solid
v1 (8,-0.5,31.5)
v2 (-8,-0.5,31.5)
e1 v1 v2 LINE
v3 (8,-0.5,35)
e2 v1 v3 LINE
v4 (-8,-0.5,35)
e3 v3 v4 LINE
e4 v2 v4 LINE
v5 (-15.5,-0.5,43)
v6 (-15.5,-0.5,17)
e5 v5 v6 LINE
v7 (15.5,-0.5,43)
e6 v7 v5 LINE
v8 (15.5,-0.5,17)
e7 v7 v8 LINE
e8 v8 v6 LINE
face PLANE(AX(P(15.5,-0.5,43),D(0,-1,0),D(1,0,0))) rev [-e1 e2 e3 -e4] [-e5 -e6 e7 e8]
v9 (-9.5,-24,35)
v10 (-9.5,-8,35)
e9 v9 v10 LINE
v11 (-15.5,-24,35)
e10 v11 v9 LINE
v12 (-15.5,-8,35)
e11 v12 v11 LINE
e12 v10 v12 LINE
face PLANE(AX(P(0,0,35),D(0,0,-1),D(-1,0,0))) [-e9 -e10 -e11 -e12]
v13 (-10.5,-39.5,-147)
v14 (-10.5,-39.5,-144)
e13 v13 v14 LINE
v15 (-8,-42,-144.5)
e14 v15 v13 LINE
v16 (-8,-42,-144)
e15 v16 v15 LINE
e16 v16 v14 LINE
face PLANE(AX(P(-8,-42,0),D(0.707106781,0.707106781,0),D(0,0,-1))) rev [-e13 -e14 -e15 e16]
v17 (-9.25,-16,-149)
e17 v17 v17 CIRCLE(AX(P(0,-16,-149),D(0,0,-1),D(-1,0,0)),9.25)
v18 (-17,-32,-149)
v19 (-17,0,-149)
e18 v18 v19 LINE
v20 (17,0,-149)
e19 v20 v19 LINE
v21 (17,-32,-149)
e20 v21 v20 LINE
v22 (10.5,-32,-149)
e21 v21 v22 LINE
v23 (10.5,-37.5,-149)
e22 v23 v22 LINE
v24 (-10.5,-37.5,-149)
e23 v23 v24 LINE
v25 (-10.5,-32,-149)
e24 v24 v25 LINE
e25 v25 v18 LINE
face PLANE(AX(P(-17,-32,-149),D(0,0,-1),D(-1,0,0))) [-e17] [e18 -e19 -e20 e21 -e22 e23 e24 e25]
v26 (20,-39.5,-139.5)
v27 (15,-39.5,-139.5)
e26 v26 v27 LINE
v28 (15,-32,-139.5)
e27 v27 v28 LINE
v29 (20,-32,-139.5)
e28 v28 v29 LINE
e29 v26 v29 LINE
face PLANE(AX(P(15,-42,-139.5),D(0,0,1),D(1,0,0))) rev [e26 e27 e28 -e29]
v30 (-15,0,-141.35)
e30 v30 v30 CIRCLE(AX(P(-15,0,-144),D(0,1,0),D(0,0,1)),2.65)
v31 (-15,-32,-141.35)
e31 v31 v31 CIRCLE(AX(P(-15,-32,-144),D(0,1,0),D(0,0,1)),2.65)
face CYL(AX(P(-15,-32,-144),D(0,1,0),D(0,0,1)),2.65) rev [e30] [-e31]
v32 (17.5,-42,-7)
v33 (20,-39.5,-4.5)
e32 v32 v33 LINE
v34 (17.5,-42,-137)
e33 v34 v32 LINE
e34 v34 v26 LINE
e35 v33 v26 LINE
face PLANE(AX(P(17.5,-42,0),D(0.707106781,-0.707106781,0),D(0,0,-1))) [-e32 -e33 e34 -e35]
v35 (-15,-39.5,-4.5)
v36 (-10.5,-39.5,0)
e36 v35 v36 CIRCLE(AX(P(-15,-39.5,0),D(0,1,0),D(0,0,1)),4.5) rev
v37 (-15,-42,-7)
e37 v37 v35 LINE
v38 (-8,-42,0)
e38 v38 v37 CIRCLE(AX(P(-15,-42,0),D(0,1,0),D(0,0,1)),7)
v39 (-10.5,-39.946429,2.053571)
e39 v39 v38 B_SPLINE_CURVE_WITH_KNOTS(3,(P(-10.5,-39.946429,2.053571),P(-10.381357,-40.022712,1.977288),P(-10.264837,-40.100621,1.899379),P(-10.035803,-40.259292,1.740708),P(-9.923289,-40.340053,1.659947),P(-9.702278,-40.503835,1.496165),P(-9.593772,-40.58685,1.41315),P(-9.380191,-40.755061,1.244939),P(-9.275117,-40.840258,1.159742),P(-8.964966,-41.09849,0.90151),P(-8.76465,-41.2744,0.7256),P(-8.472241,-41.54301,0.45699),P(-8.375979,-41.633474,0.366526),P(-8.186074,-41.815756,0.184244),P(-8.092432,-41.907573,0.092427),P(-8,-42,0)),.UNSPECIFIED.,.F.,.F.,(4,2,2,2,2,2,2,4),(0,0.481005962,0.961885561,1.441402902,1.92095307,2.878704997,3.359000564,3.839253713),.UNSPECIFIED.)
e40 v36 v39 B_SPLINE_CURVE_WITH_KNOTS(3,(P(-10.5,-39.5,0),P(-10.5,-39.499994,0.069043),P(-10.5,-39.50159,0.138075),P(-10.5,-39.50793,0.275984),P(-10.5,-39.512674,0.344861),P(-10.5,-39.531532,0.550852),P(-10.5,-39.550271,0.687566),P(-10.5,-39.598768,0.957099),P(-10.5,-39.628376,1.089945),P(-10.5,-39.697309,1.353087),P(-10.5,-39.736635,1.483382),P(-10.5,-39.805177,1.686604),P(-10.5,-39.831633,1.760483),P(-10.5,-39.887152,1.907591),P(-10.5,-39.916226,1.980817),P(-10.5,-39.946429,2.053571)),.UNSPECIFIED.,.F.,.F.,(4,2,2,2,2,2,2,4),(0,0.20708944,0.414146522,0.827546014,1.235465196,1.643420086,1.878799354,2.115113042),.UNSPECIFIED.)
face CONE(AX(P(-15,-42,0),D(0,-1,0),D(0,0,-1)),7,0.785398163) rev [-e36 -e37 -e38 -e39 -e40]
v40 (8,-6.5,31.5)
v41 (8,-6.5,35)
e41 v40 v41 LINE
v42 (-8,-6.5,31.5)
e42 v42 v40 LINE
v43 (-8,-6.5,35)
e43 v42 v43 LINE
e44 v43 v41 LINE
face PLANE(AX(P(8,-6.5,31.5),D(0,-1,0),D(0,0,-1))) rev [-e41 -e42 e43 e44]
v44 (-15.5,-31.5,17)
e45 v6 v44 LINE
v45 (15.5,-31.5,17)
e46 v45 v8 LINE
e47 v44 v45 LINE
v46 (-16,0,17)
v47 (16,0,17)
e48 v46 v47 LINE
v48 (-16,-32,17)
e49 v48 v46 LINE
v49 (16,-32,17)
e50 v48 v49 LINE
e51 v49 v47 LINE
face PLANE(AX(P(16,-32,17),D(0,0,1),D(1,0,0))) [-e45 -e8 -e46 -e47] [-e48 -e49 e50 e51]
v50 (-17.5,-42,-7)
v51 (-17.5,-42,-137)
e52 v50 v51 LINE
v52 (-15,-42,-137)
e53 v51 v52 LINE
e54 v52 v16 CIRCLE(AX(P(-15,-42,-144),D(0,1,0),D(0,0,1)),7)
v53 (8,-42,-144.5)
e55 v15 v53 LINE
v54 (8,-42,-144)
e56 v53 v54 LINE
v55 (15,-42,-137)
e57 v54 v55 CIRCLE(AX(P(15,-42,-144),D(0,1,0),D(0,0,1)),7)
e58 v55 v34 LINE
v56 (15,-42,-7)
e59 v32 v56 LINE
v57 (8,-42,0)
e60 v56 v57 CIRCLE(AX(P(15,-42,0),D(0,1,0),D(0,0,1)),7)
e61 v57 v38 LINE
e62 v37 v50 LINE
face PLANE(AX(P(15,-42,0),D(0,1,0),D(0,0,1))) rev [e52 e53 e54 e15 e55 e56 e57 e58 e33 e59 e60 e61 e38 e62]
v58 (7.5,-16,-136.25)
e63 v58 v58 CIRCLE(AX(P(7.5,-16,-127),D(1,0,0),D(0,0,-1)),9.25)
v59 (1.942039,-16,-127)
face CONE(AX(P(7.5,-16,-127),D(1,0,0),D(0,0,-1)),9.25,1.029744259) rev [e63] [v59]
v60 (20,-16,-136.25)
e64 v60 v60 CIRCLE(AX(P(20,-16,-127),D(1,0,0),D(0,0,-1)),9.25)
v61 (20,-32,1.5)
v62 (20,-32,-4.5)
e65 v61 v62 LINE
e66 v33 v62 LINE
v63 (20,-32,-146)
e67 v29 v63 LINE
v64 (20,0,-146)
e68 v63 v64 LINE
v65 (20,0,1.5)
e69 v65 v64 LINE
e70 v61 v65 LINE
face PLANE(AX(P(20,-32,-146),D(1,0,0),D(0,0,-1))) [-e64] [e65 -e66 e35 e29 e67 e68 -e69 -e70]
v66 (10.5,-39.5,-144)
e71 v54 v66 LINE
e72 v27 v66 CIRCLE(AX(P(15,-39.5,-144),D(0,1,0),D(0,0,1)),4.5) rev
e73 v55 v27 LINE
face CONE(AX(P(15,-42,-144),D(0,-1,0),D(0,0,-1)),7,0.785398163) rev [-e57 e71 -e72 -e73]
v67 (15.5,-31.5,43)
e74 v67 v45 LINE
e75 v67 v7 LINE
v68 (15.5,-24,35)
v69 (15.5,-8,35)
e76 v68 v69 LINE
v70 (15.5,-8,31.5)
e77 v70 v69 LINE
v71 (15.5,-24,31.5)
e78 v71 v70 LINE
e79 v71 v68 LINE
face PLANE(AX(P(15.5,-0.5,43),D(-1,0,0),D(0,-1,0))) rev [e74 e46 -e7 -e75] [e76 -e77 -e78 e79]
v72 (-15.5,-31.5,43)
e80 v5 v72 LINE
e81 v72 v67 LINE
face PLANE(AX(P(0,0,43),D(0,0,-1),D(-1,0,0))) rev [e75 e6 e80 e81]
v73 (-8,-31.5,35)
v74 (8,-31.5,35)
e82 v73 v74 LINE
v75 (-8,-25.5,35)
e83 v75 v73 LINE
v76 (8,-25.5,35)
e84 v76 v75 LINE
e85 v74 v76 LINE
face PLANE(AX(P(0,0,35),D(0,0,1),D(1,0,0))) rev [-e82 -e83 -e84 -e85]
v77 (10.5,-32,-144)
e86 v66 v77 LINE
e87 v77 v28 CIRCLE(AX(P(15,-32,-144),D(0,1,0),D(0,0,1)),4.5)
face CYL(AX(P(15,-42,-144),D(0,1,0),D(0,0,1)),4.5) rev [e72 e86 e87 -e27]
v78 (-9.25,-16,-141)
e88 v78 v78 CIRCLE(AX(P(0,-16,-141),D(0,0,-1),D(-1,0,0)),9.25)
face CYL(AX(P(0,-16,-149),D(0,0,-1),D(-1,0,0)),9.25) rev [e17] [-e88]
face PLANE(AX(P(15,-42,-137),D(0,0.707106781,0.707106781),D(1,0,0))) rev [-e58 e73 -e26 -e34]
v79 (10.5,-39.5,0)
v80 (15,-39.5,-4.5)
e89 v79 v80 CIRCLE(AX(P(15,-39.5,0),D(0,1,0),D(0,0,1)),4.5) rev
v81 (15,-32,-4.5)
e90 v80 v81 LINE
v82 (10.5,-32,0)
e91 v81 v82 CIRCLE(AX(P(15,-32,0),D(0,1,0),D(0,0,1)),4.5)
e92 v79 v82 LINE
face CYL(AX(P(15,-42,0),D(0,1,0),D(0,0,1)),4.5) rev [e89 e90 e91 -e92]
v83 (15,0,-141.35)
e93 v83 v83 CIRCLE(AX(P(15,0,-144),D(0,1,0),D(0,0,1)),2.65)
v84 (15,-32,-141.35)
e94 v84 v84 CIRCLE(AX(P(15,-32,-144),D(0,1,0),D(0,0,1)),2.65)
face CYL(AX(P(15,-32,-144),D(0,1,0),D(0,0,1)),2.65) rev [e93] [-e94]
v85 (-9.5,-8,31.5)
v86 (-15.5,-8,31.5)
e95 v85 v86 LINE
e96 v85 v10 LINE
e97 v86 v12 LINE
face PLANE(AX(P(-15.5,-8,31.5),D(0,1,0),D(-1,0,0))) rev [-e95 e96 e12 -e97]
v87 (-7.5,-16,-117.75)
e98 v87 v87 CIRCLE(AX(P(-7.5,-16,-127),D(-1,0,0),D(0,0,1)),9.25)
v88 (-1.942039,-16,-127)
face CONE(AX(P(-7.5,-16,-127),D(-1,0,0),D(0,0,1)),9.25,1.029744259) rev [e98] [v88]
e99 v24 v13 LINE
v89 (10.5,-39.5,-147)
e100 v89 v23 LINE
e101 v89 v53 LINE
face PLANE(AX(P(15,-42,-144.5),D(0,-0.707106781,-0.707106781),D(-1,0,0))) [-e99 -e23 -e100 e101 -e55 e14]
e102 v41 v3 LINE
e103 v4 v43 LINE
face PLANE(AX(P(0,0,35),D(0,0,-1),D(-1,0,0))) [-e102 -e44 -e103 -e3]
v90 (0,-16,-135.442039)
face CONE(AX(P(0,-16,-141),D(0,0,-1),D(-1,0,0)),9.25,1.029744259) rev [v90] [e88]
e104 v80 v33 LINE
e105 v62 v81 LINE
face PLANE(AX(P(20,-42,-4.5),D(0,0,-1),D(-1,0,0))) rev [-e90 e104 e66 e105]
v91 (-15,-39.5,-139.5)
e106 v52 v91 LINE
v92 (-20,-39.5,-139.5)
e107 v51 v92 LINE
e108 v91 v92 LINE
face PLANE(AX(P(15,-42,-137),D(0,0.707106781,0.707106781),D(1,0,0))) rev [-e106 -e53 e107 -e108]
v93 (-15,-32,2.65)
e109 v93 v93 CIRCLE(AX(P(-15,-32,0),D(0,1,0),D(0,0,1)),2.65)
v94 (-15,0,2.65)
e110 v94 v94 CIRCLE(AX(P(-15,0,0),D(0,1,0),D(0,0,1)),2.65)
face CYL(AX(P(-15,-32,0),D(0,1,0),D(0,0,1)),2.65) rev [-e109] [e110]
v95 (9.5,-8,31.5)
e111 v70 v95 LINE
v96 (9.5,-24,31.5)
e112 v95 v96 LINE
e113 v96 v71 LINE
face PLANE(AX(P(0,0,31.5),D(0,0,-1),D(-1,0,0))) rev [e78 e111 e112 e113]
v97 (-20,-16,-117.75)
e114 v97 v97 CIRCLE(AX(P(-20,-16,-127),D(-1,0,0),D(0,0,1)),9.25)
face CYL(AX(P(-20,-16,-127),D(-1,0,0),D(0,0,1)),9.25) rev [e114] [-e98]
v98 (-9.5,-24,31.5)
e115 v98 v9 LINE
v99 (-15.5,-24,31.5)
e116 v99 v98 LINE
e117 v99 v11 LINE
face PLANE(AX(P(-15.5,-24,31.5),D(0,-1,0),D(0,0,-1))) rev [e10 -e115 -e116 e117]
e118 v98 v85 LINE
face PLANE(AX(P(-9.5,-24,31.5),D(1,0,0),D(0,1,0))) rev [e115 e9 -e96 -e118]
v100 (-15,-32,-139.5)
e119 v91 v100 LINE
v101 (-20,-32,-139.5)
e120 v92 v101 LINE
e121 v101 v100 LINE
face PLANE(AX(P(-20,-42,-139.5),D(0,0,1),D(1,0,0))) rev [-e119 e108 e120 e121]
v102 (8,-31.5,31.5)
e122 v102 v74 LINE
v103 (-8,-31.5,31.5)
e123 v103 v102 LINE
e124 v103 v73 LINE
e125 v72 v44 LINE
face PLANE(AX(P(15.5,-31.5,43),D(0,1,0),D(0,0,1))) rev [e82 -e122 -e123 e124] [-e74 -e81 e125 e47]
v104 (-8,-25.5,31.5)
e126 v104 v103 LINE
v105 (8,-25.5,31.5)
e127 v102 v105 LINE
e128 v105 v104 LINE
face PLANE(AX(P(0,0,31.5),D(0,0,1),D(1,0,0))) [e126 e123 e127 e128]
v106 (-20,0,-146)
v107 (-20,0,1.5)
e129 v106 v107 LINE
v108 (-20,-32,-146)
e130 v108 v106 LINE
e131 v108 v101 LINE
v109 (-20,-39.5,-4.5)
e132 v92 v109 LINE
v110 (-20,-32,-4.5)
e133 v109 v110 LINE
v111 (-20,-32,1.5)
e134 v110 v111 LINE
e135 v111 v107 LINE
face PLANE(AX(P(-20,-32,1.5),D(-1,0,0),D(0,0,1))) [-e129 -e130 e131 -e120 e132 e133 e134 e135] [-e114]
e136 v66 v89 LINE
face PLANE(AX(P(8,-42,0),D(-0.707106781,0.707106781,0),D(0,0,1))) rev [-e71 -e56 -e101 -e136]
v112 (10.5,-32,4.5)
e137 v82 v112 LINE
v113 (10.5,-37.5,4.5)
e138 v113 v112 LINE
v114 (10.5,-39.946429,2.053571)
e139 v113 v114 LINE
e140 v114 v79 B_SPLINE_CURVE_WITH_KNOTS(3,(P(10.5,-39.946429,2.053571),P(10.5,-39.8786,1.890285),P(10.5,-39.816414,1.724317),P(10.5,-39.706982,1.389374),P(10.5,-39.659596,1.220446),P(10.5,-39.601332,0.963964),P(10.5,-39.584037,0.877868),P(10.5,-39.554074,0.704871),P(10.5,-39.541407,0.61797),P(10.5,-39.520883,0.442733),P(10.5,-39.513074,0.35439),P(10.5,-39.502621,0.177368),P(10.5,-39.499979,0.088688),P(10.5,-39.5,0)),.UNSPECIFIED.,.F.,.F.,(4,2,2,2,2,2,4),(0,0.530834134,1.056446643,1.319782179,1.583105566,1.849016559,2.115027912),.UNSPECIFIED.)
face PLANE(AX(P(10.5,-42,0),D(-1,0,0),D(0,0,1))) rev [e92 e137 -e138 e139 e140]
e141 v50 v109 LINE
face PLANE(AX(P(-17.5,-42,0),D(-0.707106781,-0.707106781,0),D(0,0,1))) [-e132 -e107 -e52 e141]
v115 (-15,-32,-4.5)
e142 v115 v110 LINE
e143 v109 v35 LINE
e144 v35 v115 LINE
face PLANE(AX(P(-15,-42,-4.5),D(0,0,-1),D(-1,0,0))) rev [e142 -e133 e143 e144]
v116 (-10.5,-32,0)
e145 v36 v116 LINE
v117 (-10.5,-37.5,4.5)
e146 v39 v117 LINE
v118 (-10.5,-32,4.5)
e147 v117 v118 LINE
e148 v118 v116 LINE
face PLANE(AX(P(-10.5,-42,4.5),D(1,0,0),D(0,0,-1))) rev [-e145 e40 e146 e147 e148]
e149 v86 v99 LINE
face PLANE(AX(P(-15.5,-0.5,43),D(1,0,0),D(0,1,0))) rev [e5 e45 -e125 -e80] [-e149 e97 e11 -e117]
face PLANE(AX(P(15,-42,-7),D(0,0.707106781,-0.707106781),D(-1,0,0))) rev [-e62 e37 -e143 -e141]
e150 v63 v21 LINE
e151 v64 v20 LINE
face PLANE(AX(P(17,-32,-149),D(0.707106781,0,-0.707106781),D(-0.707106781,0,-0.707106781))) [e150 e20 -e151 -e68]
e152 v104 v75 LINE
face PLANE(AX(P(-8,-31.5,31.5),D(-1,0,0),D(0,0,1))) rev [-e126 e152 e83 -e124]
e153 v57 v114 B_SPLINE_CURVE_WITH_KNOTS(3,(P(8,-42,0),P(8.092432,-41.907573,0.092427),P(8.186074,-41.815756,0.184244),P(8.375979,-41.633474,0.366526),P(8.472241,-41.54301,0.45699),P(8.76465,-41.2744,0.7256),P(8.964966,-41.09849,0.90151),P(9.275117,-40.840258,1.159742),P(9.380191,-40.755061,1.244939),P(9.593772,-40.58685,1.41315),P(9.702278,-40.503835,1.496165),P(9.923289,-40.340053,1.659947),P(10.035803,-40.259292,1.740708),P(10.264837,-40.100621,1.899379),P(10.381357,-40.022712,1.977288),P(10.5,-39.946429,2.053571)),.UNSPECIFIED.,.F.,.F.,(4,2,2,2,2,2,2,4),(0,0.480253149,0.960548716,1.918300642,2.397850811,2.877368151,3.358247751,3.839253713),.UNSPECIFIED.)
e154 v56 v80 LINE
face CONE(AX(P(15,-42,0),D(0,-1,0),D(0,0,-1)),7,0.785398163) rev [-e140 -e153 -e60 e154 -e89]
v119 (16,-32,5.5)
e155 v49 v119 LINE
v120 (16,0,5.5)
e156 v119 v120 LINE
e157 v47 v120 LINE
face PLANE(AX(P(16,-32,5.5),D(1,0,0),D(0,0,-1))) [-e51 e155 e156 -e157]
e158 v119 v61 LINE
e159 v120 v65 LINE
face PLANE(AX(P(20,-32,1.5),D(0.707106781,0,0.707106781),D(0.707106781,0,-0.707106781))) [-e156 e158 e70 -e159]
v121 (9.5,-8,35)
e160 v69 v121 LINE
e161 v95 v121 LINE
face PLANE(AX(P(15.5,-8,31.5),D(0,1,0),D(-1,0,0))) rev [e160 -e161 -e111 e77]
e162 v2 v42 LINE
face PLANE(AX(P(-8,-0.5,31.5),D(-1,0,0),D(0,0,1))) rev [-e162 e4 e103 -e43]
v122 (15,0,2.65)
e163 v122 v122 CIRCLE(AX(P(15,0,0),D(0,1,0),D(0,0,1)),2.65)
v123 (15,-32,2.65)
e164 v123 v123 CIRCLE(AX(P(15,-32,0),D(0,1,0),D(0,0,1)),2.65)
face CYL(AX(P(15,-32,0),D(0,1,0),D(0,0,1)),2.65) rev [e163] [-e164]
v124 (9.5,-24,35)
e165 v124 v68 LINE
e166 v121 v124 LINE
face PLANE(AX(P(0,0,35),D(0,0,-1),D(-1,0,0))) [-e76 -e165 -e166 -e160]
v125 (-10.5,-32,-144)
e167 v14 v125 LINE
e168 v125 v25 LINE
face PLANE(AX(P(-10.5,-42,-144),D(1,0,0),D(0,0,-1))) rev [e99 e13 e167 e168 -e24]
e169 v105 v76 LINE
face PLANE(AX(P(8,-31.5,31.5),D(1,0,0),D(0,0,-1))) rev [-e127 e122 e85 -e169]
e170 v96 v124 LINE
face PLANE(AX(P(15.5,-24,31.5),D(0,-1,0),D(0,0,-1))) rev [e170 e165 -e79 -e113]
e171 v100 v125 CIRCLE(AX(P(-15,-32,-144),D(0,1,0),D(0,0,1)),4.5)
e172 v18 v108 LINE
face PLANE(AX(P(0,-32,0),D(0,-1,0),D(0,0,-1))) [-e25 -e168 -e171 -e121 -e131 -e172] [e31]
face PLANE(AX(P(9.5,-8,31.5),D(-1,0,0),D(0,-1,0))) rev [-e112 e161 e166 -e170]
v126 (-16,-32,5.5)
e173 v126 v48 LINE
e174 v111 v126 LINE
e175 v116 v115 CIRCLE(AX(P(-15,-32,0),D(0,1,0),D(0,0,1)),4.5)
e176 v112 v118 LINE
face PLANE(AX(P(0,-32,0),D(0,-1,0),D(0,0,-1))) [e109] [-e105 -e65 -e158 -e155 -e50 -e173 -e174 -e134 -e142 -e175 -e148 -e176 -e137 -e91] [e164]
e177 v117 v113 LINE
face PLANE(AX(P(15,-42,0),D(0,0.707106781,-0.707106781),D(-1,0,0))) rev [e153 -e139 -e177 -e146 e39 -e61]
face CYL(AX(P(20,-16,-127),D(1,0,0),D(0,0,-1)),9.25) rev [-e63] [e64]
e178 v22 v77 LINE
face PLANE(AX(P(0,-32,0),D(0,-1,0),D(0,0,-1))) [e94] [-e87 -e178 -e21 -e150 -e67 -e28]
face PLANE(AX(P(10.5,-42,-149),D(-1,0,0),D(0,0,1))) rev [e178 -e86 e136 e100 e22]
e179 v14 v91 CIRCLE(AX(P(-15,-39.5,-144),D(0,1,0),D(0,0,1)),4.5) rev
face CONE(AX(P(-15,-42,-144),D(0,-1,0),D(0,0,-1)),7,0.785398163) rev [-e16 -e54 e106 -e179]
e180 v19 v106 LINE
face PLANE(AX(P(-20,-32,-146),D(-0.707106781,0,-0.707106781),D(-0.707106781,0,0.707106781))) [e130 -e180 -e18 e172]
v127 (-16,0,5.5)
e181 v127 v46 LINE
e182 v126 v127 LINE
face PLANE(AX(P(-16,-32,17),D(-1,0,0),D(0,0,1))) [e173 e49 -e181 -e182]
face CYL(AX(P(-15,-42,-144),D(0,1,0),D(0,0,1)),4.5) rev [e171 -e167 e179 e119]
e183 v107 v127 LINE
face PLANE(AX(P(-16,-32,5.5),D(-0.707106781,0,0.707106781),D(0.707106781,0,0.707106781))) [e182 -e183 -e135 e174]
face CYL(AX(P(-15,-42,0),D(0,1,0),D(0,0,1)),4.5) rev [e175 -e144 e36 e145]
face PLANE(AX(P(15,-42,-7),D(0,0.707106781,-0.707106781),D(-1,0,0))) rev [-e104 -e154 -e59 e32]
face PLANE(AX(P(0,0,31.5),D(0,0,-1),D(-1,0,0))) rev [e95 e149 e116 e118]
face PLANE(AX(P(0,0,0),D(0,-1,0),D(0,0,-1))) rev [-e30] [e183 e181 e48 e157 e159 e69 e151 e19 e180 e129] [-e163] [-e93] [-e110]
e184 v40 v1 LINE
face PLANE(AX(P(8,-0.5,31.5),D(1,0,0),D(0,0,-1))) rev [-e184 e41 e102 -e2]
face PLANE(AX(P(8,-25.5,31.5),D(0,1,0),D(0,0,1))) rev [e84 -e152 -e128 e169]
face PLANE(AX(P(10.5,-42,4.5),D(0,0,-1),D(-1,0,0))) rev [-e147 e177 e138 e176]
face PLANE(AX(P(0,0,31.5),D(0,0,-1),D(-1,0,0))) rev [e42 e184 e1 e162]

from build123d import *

# Parameters (mm, degrees)
SKIZZE1_R                       = 2.65
AUFSATZ_LINEAR_AUSTRAGEN1_DEPTH = 32
SKIZZE2_W                       = 31
SKIZZE2_H                       = 31
AUFSATZ_LINEAR_AUSTRAGEN2_DEPTH = 26
AUFSATZ_LINEAR_AUSTRAGEN3_DEPTH = 10
FASE2_SIZE                      = 4.5
FASE1_SIZE                      = 2.5
M20X1_5_GEWINDEBOHRUNG1_D       = 18.5
M20X1_5_GEWINDEBOHRUNG1_DEPTH   = 8
M20X1_5_GEWINDEBOHRUNG1_TIP     = 5.557960726
M20X1_5_GEWINDEBOHRUNG2_D       = 18.5
M20X1_5_GEWINDEBOHRUNG2_DEPTH   = 12.5
M20X1_5_GEWINDEBOHRUNG2_TIP     = 5.557960726
M20X1_5_GEWINDEBOHRUNG3_D       = 18.5
M20X1_5_GEWINDEBOHRUNG3_DEPTH   = 12.5
M20X1_5_GEWINDEBOHRUNG3_TIP     = 5.557960726
SKIZZE10_W                      = 6
SKIZZE10_H                      = 16
SKIZZE10_W_2                    = 16
SKIZZE10_H_2                    = 6
SCHNITT_LINEAR_AUSTRAGEN1_DEPTH = 3.5


with BuildPart() as part:
    # Skizze1 → Aufsatz-Linear austragen1 (new body)
    with BuildSketch(Plane(origin=(0, 0, 0), x_dir=(1, 0, 0), z_dir=(0, 1, 0))):
        Polygon((16, -17), (-16, -17), (-16, -5.5), (-20, -1.5), (-20, 146), (-17, 149), (17, 149), (20, 146), (20, -1.5), (16, -5.5), align=None)
        with Locations(Location((15, 0, 0), (0, 0, 270))):
            Circle(SKIZZE1_R, mode=Mode.SUBTRACT)
        with Locations(Location((-15, 0, 0), (0, 0, 270))):
            Circle(SKIZZE1_R, mode=Mode.SUBTRACT)
        with Locations(Location((-15, 144, 0), (0, 0, 270))):
            Circle(SKIZZE1_R, mode=Mode.SUBTRACT)
        with Locations(Location((15, 144, 0), (0, 0, 270))):
            Circle(SKIZZE1_R, mode=Mode.SUBTRACT)
    extrude(amount=-AUFSATZ_LINEAR_AUSTRAGEN1_DEPTH)

    # Skizze2 → Aufsatz-Linear austragen2 (add)
    with BuildSketch(Plane.XY.offset(17)):
        with Locations((0, -16)):
            Rectangle(SKIZZE2_W, SKIZZE2_H)
    extrude(amount=AUFSATZ_LINEAR_AUSTRAGEN2_DEPTH)

    # Skizze3 → Aufsatz-Linear austragen3 (add)
    with BuildSketch(Plane.XZ.offset(32)):
        with BuildLine():
            Line((20, -4.5), (15, -4.5))
            ThreePointArc((15, -4.5), (11.818019485, -3.181980515), (10.5, 0))
            Line((10.5, 0), (10.5, 4.5))
            Line((10.5, 4.5), (-10.5, 4.5))
            Line((-10.5, 4.5), (-10.5, 0))
            ThreePointArc((-10.5, 0), (-11.818019485, -3.181980515), (-15, -4.5))
            Line((-15, -4.5), (-20, -4.5))
            Line((-20, -4.5), (-20, -139.5))
            Line((-20, -139.5), (-15, -139.5))
            ThreePointArc((-15, -139.5), (-11.818019485, -140.818019485), (-10.5, -144))
            Line((-10.5, -144), (-10.5, -149))
            Line((-10.5, -149), (10.5, -149))
            Line((10.5, -149), (10.5, -144))
            ThreePointArc((10.5, -144), (11.818019485, -140.818019485), (15, -139.5))
            Line((15, -139.5), (20, -139.5))
            Line((20, -139.5), (20, -4.5))
        make_face()
    extrude(amount=AUFSATZ_LINEAR_AUSTRAGEN3_DEPTH)

    # Fase2
    fase2_edges = [part.edges().sort_by_distance(p)[0] for p in [
        (0, -42, 4.5),
        (0, -42, -149),
    ]]
    chamfer(fase2_edges, length=FASE2_SIZE)

    # Fase1
    # the kernel refuses this chamfer: 2.5 mm, written as the material it takes off along each edge
    with BuildSketch(Plane(origin=(10.5, -42, -150.92920747), x_dir=(0.027495876610586282, 0.9996219169112968, 0), z_dir=(0, 0, 1)), Plane(origin=(-10.5, -42, -144), x_dir=(-0.027495876610586282, 0.9996219169112968, 0), z_dir=(0, 0, -1))) as fase1_piece_1:
        Polygon((FASE1_SIZE * 0.999621916911, FASE1_SIZE * 0.0274958766106), (-FASE1_SIZE * 0.0274958766106, FASE1_SIZE * 0.999621916911), (0, 0), align=None)
    extrude(amount=6.92920747, mode=Mode.SUBTRACT)
    with BuildSketch(Plane(origin=(20, -42, -145.92920747), x_dir=(-0.9996219169112968, -0.0274958766105877, 0), z_dir=(0, 0, 1)), Plane(origin=(-20, -42, 1.92920747), x_dir=(0.9996219169112968, -0.0274958766105877, 0), z_dir=(0, 0, -1))) as fase1_piece_2:
        Polygon((FASE1_SIZE * 0.999621916911, -FASE1_SIZE * 0.0274958766106), (-FASE1_SIZE * 0.0274958766106, -FASE1_SIZE * 0.999621916911), (0, 0), align=None)
    extrude(amount=147.85841494, mode=Mode.SUBTRACT)
    with BuildSketch(Plane(origin=(26.42920747, -42, -4.5), x_dir=(0, -0.0274958766105877, -0.9996219169112968), z_dir=(-1, 0, 0)), Plane(origin=(-15, -42, -4.5), x_dir=(0, -0.0274958766105877, -0.9996219169112968), z_dir=(-1, 0, 0)), Plane(origin=(-26.42920747, -42, -139.5), x_dir=(0, -0.027495876610587815, 0.9996219169112968), z_dir=(1, 0, 0)), Plane(origin=(15, -42, -139.5), x_dir=(0, -0.027495876610587815, 0.9996219169112968), z_dir=(1, 0, 0))) as fase1_piece_3:
        Polygon((FASE1_SIZE * 0.999621916911, -FASE1_SIZE * 0.0274958766106), (-FASE1_SIZE * 0.0274958766106, -FASE1_SIZE * 0.999621916911), (0, 0), align=None)
    extrude(amount=11.42920747, mode=Mode.SUBTRACT)
    with BuildSketch(Plane(origin=(15, -42, 0), x_dir=(0, 0, -1), z_dir=(1, 0, 0))) as fase1_piece_4:
        Polygon((4.5 + FASE1_SIZE, 0), (4.5, FASE1_SIZE), (4.5, 0), align=None)
    revolve(axis=Axis((15, -42, 0), (0, 1, 0)), revolution_arc=171.892095433, mode=Mode.SUBTRACT)
    with BuildSketch(Plane(origin=(-15, -42, 0), x_dir=(0.14103781497281773, 0, 0.9900042094595827), z_dir=(-0.9900042094595827, 0, 0.14103781497281773))) as fase1_piece_5:
        Polygon((4.5 + FASE1_SIZE, 0), (4.5, FASE1_SIZE), (4.5, 0), align=None)
    revolve(axis=Axis((-15, -42, 0), (0, 1, 0)), revolution_arc=171.892095433, mode=Mode.SUBTRACT)
    with BuildSketch(Plane(origin=(-15, -42, -144), x_dir=(0, 0, 1), z_dir=(-1, 0, 0))) as fase1_piece_6:
        Polygon((4.5 + FASE1_SIZE, 0), (4.5, FASE1_SIZE), (4.5, 0), align=None)
    revolve(axis=Axis((-15, -42, -144), (0, 1, 0)), revolution_arc=90, mode=Mode.SUBTRACT)
    with BuildSketch(Plane(origin=(15, -42, -144), x_dir=(-1, 0, 0), z_dir=(0, 0, -1))) as fase1_piece_7:
        Polygon((4.5 + FASE1_SIZE, 0), (4.5, FASE1_SIZE), (4.5, 0), align=None)
    revolve(axis=Axis((15, -42, -144), (0, 1, 0)), revolution_arc=90, mode=Mode.SUBTRACT)

    # M20x1.5 Gewindebohrung1
    with Locations(Plane(origin=(0, 0, -149), x_dir=(-1, 0, 0), z_dir=(0, 0, -1))):
        with Locations((0, -16)):
            Hole(M20X1_5_GEWINDEBOHRUNG1_D / 2, depth=M20X1_5_GEWINDEBOHRUNG1_DEPTH)
            with Locations((0, 0, -(M20X1_5_GEWINDEBOHRUNG1_DEPTH + M20X1_5_GEWINDEBOHRUNG1_TIP / 2))):  # 118° drill point
                Cone(0, M20X1_5_GEWINDEBOHRUNG1_D / 2, M20X1_5_GEWINDEBOHRUNG1_TIP, mode=Mode.SUBTRACT)

    # M20x1.5 Gewindebohrung2
    with Locations(Plane.ZY.offset(20)):
        with Locations((-127, -16)):
            Hole(M20X1_5_GEWINDEBOHRUNG2_D / 2, depth=M20X1_5_GEWINDEBOHRUNG2_DEPTH)
            with Locations((0, 0, -(M20X1_5_GEWINDEBOHRUNG2_DEPTH + M20X1_5_GEWINDEBOHRUNG2_TIP / 2))):  # 118° drill point
                Cone(0, M20X1_5_GEWINDEBOHRUNG2_D / 2, M20X1_5_GEWINDEBOHRUNG2_TIP, mode=Mode.SUBTRACT)

    # M20x1.5 Gewindebohrung3
    with Locations(Plane(origin=(20, 0, 0), x_dir=(0, 0, -1), z_dir=(1, 0, 0))):
        with Locations((127, -16)):
            Hole(M20X1_5_GEWINDEBOHRUNG3_D / 2, depth=M20X1_5_GEWINDEBOHRUNG3_DEPTH)
            with Locations((0, 0, -(M20X1_5_GEWINDEBOHRUNG3_DEPTH + M20X1_5_GEWINDEBOHRUNG3_TIP / 2))):  # 118° drill point
                Cone(0, M20X1_5_GEWINDEBOHRUNG3_D / 2, M20X1_5_GEWINDEBOHRUNG3_TIP, mode=Mode.SUBTRACT)

    # Skizze10 → Schnitt-Linear austragen1 (cut)
    with BuildSketch(Plane.XY.offset(35)):
        with Locations((12.5, -16)):
            Rectangle(SKIZZE10_W, SKIZZE10_H)
        with Locations((0, -28.5)):
            Rectangle(SKIZZE10_W_2, SKIZZE10_H_2)
        with Locations((-12.5, -16)):
            Rectangle(SKIZZE10_W, SKIZZE10_H)
        with Locations((0, -3.5)):
            Rectangle(SKIZZE10_W_2, SKIZZE10_H_2)
    extrude(amount=-SCHNITT_LINEAR_AUSTRAGEN1_DEPTH, mode=Mode.SUBTRACT)


solid = part.part
